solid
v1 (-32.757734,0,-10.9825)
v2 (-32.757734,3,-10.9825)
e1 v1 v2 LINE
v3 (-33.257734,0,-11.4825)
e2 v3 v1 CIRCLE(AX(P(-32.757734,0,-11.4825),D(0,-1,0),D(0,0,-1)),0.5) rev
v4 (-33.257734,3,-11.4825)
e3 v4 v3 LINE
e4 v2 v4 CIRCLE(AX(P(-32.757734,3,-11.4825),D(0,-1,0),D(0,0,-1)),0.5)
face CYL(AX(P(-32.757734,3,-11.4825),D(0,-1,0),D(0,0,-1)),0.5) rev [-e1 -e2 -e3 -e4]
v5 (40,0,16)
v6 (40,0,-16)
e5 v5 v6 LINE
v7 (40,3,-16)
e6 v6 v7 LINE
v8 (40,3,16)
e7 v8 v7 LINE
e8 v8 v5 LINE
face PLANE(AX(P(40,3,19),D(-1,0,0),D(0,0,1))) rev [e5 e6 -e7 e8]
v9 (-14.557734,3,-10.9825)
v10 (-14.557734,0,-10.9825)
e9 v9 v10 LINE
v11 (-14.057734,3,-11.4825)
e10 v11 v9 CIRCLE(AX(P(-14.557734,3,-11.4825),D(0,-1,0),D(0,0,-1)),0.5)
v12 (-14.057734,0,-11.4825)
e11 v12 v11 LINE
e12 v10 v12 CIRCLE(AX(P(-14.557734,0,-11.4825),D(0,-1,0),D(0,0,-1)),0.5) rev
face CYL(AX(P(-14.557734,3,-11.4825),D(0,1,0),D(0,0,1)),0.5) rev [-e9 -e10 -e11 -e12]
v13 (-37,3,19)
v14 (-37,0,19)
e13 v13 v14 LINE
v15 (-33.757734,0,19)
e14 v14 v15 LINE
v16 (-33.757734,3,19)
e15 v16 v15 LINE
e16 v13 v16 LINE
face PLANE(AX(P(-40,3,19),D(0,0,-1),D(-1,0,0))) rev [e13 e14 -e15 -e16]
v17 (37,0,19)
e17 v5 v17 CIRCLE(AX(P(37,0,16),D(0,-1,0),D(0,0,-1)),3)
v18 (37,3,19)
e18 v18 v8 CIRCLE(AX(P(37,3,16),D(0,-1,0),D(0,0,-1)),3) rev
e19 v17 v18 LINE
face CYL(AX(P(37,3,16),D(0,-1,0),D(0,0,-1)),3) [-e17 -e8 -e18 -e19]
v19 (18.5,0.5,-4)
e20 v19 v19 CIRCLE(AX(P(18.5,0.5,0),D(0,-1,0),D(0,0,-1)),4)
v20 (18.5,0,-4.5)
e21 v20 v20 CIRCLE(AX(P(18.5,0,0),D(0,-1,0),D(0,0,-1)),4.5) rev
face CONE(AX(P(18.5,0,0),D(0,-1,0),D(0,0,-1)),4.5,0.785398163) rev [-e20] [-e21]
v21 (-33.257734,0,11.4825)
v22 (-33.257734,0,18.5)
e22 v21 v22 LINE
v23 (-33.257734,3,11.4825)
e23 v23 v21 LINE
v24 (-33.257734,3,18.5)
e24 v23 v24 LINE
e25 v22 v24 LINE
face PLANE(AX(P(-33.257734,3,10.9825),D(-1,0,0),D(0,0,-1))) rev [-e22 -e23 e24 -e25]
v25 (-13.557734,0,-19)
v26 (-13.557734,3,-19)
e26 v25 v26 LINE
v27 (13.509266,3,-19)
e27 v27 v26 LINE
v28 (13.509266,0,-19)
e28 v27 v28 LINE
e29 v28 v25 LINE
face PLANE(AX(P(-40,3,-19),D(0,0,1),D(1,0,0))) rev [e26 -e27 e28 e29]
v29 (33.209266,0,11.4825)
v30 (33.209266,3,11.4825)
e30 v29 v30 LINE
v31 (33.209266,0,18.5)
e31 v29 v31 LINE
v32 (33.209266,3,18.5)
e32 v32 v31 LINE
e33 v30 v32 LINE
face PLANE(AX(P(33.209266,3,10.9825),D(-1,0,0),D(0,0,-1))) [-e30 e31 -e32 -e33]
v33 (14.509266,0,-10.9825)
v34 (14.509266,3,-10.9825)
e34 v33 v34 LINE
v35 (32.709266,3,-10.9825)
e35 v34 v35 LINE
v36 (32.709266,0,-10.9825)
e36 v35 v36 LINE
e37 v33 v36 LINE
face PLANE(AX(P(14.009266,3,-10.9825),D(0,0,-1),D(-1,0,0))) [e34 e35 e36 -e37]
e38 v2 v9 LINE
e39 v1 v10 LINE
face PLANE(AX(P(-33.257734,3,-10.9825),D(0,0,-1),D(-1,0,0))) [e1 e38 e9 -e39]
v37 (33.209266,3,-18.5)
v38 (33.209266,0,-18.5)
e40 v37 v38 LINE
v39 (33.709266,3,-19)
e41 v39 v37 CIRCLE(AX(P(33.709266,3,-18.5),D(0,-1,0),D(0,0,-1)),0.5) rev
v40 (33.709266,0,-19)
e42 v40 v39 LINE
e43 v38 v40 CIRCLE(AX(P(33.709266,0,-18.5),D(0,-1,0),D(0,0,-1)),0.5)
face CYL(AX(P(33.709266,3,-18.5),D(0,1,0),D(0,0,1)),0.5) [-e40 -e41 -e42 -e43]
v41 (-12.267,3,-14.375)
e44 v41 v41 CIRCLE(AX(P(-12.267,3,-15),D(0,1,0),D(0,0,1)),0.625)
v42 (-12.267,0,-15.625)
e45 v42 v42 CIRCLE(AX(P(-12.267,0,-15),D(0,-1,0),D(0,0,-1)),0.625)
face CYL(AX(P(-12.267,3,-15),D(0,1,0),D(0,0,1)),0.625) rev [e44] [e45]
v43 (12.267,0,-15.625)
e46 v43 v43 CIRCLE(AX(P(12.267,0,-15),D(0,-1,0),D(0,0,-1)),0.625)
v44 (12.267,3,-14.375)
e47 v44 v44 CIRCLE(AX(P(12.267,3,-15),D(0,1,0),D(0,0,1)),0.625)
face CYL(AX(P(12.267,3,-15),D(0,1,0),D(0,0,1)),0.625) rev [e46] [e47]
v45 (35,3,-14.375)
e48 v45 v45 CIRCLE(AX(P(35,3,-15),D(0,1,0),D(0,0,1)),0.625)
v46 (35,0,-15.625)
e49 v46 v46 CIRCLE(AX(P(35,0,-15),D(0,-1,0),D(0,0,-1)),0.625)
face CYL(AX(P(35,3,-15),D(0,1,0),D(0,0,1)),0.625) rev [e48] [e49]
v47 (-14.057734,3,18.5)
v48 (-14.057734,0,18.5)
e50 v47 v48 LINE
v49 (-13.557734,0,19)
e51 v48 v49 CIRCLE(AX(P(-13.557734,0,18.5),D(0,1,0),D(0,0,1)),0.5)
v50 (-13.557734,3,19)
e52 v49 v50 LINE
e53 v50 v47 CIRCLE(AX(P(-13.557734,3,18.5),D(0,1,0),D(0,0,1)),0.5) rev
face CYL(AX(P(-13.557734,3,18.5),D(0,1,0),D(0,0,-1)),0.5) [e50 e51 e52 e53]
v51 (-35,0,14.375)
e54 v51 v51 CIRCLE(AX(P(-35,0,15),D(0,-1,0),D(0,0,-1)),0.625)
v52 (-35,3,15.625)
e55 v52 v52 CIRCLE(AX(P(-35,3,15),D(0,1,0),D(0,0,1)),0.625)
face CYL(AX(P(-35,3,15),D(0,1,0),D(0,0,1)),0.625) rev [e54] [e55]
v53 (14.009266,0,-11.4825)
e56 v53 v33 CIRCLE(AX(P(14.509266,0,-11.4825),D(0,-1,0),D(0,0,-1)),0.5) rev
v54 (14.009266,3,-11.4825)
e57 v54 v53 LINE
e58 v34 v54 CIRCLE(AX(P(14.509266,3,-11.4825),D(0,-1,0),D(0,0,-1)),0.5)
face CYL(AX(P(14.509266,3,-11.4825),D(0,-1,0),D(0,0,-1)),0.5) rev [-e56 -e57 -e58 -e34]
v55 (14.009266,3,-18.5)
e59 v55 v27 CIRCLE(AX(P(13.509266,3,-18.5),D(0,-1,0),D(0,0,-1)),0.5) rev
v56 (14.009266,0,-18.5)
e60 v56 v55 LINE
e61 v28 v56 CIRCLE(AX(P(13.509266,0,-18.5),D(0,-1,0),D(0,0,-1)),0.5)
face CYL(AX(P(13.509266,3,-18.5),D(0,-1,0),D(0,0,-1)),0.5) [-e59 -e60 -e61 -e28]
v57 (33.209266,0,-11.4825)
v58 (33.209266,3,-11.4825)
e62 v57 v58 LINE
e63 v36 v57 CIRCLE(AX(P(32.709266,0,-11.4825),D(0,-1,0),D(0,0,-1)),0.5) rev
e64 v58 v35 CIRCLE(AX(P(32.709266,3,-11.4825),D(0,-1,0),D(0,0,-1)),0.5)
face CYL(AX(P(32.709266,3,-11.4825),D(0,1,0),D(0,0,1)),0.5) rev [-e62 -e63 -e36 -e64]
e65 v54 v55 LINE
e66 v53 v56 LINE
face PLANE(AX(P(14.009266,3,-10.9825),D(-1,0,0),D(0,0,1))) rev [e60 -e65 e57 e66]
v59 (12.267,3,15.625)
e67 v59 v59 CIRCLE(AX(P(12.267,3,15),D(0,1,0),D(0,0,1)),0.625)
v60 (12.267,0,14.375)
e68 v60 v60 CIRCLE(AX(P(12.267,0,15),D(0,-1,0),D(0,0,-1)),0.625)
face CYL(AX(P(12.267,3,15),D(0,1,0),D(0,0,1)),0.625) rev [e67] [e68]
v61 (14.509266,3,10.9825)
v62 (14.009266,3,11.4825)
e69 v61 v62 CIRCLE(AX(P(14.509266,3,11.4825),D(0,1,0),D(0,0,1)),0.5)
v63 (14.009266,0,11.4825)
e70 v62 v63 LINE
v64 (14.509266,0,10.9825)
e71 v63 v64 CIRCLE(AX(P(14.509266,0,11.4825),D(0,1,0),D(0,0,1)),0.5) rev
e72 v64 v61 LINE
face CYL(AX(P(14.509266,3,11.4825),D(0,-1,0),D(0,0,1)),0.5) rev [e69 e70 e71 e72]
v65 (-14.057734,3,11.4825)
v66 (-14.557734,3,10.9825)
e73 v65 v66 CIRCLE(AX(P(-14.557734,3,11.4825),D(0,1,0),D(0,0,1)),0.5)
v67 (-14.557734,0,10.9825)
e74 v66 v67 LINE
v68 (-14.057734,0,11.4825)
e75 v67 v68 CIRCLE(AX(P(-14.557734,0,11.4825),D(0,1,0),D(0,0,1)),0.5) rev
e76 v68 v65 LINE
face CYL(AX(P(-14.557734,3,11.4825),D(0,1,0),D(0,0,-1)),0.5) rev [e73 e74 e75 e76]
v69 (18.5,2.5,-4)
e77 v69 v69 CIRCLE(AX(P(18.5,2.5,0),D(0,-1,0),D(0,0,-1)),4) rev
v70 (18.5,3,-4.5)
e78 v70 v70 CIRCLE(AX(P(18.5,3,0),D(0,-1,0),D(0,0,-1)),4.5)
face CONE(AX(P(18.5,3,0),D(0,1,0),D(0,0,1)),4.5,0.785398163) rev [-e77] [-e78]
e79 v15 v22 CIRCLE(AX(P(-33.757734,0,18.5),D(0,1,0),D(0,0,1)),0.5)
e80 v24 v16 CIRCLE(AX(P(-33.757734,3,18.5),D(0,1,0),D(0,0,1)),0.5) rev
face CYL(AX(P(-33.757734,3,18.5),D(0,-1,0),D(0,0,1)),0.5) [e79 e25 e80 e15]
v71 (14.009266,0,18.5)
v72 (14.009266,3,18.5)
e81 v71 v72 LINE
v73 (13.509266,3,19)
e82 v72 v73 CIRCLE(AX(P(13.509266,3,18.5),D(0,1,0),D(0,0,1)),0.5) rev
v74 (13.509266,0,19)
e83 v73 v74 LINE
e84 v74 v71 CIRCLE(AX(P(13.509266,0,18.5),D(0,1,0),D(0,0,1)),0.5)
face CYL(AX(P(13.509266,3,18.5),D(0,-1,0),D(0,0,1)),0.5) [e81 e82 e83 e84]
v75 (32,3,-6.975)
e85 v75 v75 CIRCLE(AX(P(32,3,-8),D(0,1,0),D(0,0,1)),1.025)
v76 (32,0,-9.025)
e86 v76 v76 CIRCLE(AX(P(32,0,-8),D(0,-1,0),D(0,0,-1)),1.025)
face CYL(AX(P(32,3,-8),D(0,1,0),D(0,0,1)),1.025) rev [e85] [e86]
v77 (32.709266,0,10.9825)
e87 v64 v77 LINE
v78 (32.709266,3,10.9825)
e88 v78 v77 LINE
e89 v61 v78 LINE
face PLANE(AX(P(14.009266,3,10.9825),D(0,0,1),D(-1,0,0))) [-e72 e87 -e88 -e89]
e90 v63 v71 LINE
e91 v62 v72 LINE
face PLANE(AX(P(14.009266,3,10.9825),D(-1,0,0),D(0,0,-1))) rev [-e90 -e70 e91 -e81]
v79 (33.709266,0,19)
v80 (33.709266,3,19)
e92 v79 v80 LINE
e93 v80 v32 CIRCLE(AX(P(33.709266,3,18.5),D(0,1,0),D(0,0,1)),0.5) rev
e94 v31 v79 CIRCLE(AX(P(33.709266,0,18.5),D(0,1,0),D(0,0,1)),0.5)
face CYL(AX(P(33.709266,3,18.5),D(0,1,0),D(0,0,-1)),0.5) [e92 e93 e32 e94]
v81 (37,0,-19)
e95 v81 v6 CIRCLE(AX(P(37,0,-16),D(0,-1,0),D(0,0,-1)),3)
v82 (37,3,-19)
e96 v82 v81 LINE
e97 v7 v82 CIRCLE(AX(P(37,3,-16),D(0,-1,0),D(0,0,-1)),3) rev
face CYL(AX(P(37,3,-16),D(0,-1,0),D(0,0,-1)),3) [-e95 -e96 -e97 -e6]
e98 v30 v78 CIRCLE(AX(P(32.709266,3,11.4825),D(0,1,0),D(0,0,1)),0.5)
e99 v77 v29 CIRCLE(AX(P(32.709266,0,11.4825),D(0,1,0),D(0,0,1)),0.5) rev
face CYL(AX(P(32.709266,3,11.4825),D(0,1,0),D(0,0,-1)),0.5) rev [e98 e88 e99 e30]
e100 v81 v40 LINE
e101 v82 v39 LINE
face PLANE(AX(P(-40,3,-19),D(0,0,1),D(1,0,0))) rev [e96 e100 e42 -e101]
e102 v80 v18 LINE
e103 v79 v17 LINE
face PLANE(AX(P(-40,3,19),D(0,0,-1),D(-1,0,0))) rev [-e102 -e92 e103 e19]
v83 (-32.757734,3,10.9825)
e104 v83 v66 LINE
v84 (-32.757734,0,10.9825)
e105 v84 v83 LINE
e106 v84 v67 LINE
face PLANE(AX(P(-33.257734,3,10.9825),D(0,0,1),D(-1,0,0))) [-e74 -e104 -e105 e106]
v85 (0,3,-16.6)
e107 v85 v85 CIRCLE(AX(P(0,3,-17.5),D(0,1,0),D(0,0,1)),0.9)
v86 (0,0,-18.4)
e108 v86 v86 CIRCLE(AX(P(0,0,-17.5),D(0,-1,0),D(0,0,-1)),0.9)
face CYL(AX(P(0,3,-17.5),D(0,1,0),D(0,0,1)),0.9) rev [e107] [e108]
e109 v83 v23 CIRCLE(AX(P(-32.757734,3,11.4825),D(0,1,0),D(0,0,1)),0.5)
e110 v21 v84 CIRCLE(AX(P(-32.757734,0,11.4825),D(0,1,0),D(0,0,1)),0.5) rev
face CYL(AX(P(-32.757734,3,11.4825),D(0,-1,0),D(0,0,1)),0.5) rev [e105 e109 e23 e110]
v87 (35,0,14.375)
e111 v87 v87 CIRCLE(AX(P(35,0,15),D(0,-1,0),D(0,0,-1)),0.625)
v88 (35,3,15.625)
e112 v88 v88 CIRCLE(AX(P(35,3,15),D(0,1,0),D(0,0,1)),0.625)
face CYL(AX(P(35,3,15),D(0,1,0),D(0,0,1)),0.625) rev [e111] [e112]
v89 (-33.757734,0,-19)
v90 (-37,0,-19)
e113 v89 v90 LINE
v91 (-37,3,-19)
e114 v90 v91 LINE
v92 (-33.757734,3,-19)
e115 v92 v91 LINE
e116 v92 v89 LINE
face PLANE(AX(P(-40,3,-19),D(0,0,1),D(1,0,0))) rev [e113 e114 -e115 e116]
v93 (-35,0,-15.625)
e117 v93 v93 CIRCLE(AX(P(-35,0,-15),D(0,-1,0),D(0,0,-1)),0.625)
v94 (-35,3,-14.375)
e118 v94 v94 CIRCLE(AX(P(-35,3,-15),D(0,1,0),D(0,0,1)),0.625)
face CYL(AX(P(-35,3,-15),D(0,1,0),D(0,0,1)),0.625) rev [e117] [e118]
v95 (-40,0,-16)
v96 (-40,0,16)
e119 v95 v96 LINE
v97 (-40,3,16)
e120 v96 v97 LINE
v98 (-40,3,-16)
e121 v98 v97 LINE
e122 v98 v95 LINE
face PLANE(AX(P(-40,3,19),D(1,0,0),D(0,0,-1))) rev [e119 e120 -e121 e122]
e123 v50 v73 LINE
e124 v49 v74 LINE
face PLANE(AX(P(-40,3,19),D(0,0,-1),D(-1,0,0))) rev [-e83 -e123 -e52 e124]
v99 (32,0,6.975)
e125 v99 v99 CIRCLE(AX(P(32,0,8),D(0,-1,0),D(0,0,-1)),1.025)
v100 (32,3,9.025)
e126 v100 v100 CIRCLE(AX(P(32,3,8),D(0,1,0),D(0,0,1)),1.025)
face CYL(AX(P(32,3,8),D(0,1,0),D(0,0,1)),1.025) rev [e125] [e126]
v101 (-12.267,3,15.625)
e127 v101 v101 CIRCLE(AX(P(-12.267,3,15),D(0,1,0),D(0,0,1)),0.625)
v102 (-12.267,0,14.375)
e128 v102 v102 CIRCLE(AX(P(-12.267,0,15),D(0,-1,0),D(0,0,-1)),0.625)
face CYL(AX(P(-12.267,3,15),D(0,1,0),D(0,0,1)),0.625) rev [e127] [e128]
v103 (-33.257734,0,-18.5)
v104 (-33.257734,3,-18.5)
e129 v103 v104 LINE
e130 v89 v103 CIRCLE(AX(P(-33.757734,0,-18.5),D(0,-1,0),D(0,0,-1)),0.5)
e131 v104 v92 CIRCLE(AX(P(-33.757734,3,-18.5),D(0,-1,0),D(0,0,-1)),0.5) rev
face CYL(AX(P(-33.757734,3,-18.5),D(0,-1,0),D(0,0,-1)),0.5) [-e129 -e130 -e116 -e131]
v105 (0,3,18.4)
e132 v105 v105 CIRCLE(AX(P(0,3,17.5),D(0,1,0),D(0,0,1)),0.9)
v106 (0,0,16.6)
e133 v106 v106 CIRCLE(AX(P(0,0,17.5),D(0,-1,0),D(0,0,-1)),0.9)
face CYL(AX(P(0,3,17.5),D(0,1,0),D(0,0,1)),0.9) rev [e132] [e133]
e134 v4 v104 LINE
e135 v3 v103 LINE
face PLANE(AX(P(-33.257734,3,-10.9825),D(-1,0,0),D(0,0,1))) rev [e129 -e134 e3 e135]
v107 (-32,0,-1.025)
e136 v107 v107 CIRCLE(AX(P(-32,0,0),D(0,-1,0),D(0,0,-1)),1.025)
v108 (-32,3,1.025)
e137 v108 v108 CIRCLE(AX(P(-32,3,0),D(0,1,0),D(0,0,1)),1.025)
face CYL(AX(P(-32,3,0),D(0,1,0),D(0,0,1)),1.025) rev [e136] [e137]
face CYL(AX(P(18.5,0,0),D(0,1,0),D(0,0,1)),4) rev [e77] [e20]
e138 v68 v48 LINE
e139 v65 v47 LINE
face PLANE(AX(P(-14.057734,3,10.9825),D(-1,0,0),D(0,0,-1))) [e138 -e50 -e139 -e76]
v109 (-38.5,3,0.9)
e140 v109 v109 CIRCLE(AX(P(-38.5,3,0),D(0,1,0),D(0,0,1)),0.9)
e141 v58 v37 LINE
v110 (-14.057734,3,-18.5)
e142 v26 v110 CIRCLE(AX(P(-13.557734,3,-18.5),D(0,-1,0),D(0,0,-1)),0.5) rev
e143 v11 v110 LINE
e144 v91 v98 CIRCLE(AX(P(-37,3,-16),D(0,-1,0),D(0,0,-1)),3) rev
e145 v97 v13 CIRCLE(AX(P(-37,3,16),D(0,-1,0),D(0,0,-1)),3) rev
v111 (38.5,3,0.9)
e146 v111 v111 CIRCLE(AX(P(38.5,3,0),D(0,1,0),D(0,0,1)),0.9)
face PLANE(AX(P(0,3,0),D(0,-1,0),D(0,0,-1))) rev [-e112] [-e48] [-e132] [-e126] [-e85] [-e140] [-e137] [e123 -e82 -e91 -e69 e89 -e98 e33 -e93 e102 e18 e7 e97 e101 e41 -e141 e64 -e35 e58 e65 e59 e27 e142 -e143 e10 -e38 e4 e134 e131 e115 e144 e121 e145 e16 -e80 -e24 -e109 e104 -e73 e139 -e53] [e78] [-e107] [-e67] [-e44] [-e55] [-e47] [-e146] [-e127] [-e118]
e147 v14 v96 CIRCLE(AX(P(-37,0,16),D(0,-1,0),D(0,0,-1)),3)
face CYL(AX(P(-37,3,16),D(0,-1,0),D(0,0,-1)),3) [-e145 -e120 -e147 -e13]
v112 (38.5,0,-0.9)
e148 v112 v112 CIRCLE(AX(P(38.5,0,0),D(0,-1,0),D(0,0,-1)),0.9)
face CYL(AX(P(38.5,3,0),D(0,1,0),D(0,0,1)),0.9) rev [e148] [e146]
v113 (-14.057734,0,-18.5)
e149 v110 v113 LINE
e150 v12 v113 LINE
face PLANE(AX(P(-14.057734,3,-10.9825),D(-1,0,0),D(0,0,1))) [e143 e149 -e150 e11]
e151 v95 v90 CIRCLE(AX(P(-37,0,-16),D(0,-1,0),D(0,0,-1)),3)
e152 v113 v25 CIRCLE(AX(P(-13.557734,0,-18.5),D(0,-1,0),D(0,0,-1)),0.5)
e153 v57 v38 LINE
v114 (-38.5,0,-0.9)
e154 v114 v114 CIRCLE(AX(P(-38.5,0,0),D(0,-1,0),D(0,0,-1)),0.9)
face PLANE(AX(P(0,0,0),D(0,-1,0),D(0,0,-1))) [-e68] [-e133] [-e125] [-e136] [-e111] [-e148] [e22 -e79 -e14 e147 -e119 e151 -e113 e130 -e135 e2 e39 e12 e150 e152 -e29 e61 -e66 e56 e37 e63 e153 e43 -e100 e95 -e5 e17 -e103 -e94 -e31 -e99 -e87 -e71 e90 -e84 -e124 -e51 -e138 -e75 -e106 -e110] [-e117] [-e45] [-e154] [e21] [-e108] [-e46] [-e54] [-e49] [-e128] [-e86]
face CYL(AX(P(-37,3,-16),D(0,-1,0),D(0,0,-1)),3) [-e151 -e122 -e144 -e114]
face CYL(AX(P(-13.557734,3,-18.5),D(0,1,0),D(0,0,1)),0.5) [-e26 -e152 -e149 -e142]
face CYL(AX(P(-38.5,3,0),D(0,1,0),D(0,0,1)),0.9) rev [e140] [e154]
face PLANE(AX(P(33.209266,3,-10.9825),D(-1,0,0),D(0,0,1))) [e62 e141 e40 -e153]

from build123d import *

# Parameters (mm, degrees)
SKETCH1_W                    = 80
SKETCH1_H                    = 38
BOSS_EXTRUDE1_DEPTH          = 3
M1_6X0_35_TAPPED_HOLE1_D     = 1.25
M1_6X0_35_TAPPED_HOLE1_DEPTH = 4.95
M1_6X0_35_TAPPED_HOLE1_TIP   = 0.375537887
FILLET1_R                    = 3
SKETCH6_W                    = 19.2
SKETCH6_H                    = 8.035
CUT_EXTRUDE1_DEPTH           = 45.384682042
FILLET2_R                    = 0.5
LPATTERN1_COUNT              = 2
LPATTERN1_PITCH              = 47.267
FILLET2_OF_LPATTERN1_R       = 0.5
MIRROR1_DEPTH                = 3
M1_6_CLEARANCE_HOLE3_D       = 1.8
M1_6_CLEARANCE_HOLE3_DEPTH   = 4.25
M1_6_CLEARANCE_HOLE3_TIP     = 0.540774557
M2_5X0_45_TAPPED_HOLE1_D     = 2.05
M2_5X0_45_TAPPED_HOLE1_DEPTH = 7.25
M2_5X0_45_TAPPED_HOLE1_TIP   = 0.615882135
CUT_EXTRUDE2_DEPTH           = 45.384682042
CUT_EXTRUDE2_DEPTH_BACK      = 45.384682042
SKETCH16_R                   = 4
CHAMFER1_SIZE                = 0.5


# Read off the part's stored shape, not the designer's step: Mirror1
with BuildPart() as part:
    # Sketch1 → Boss-Extrude1 (new body)
    with BuildSketch(Plane(origin=(0, 0, 0), x_dir=(1, 0, 0), z_dir=(0, 1, 0))):
        Rectangle(SKETCH1_W, SKETCH1_H)
    extrude(amount=BOSS_EXTRUDE1_DEPTH)

    # M1.6x0.35 Tapped Hole1
    with Locations(Plane(origin=(0, 3, 0), x_dir=(1, 0, 0), z_dir=(0, 1, 0))):
        with Locations((-35, 15), (-12.267, 15), (-12.267, -15), (-35, -15), (12.267, -15), (35, -15), (35, 15), (12.267, 15)):
            Hole(M1_6X0_35_TAPPED_HOLE1_D / 2, depth=M1_6X0_35_TAPPED_HOLE1_DEPTH)
            with Locations((0, 0, -(M1_6X0_35_TAPPED_HOLE1_DEPTH + M1_6X0_35_TAPPED_HOLE1_TIP / 2))):  # 118° drill point
                Cone(0, M1_6X0_35_TAPPED_HOLE1_D / 2, M1_6X0_35_TAPPED_HOLE1_TIP, mode=Mode.SUBTRACT)

    # Fillet1
    fillet1_edges = [part.edges().sort_by_distance(p)[0] for p in [
        (40, 1.5, 19),
        (-40, 1.5, 19),
        (-40, 1.5, -19),
        (40, 1.5, -19),
    ]]
    fillet(fillet1_edges, radius=FILLET1_R)

    # Sketch6 → Cut-Extrude1 (cut, symmetric)
    with BuildSketch(Plane.XZ):
        with Locations((-23.657734471, -15)):
            Rectangle(SKETCH6_W, SKETCH6_H)
    cut_extrude1 = extrude(amount=CUT_EXTRUDE1_DEPTH, both=True, mode=Mode.SUBTRACT)

    # Fillet2
    fillet2_edges = [part.edges().sort_by_distance(p)[0] for p in [
        (-33.257734471, 1.5, -19),
        (-14.057734471, 1.5, -10.9825),
        (-33.257734471, 1.5, -10.9825),
        (-14.057734471, 1.5, -19),
    ]]
    fillet(fillet2_edges, radius=FILLET2_R)

    # LPattern1: Cut-Extrude1 ×2
    with Locations(*[(i * LPATTERN1_PITCH, 0, 0) for i in range(1, LPATTERN1_COUNT)]):
        add(cut_extrude1, mode=Mode.SUBTRACT)

    # Fillet2 of LPattern1
    fillet2_of_lpattern1_edges = [part.edges().sort_by_distance(p)[0] for p in [
        (14.009265529, 1.5, -19),
        (33.209265529, 1.5, -10.9825),
        (14.009265529, 1.5, -10.9825),
        (33.209265529, 1.5, -19),
    ]]
    fillet(fillet2_of_lpattern1_edges, radius=FILLET2_OF_LPATTERN1_R)

    # Mirror1 outline → Mirror1 (cut)
    with BuildSketch(Plane(origin=(0, 0, 0), x_dir=(1, 0, 0), z_dir=(0, 1, 0))):
        with BuildLine():
            ThreePointArc((-32.757734471, -10.9825), (-33.111287862, -11.128946609), (-33.257734471, -11.4825))
            Line((-33.257734471, -11.4825), (-33.257734471, -18.5))
            ThreePointArc((-33.257734471, -18.5), (-33.40418108, -18.853553391), (-33.757734471, -19))
            Line((-33.757734471, -19), (-13.557734471, -19))
            ThreePointArc((-13.557734471, -19), (-13.911287861, -18.853553391), (-14.057734471, -18.5))
            Line((-14.057734471, -18.5), (-14.057734471, -11.4825))
            ThreePointArc((-14.057734471, -11.4825), (-14.20418108, -11.128946609), (-14.557734471, -10.9825))
            Line((-14.557734471, -10.9825), (-32.757734471, -10.9825))
        make_face()
        with BuildLine():
            ThreePointArc((14.009265529, -18.5), (13.86281892, -18.853553391), (13.509265529, -19))
            Line((13.509265529, -19), (33.709265529, -19))
            ThreePointArc((33.709265529, -19), (33.355712139, -18.853553391), (33.209265529, -18.5))
            Line((33.209265529, -18.5), (33.209265529, -11.4825))
            ThreePointArc((33.209265529, -11.4825), (33.06281892, -11.128946609), (32.709265529, -10.9825))
            Line((32.709265529, -10.9825), (14.509265529, -10.9825))
            ThreePointArc((14.509265529, -10.9825), (14.155712139, -11.128946609), (14.009265529, -11.4825))
            Line((14.009265529, -11.4825), (14.009265529, -18.5))
        make_face()
    extrude(amount=MIRROR1_DEPTH, mode=Mode.SUBTRACT)

    # M1.6 Clearance Hole3
    with Locations(Plane(origin=(0, 3, 0), x_dir=(1, 0, 0), z_dir=(0, 1, 0))):
        with Locations((-38.5, 0), (0, 17.5), (38.5, 0), (0, -17.5)):
            Hole(M1_6_CLEARANCE_HOLE3_D / 2, depth=M1_6_CLEARANCE_HOLE3_DEPTH)
            with Locations((0, 0, -(M1_6_CLEARANCE_HOLE3_DEPTH + M1_6_CLEARANCE_HOLE3_TIP / 2))):  # 118° drill point
                Cone(0, M1_6_CLEARANCE_HOLE3_D / 2, M1_6_CLEARANCE_HOLE3_TIP, mode=Mode.SUBTRACT)

    # M2.5x0.45 Tapped Hole1
    with Locations(Plane(origin=(0, 3, 0), x_dir=(1, 0, 0), z_dir=(0, 1, 0))):
        with Locations((32, 8), (32, -8), (-32, 0)):
            Hole(M2_5X0_45_TAPPED_HOLE1_D / 2, depth=M2_5X0_45_TAPPED_HOLE1_DEPTH)
            with Locations((0, 0, -(M2_5X0_45_TAPPED_HOLE1_DEPTH + M2_5X0_45_TAPPED_HOLE1_TIP / 2))):  # 118° drill point
                Cone(0, M2_5X0_45_TAPPED_HOLE1_D / 2, M2_5X0_45_TAPPED_HOLE1_TIP, mode=Mode.SUBTRACT)

    # Sketch16 → Cut-Extrude2 (cut, two sides: drawn at the far end of the back side and taken through both)
    with BuildSketch(Plane(origin=(0, 3, 0), x_dir=(1, 0, 0), z_dir=(0, 1, 0)).offset(-CUT_EXTRUDE2_DEPTH_BACK)):
        with Locations(Location((18.5, 0, 0), (0, 0, 270))):
            Circle(SKETCH16_R)
    extrude(amount=CUT_EXTRUDE2_DEPTH + CUT_EXTRUDE2_DEPTH_BACK, mode=Mode.SUBTRACT)

    # Chamfer1
    chamfer1_edges = [part.edges().sort_by_distance(p)[0] for p in [
        (18.5, 0, -4),
        (18.5, 3, -4),
    ]]
    chamfer(chamfer1_edges, length=CHAMFER1_SIZE)


solid = part.part
